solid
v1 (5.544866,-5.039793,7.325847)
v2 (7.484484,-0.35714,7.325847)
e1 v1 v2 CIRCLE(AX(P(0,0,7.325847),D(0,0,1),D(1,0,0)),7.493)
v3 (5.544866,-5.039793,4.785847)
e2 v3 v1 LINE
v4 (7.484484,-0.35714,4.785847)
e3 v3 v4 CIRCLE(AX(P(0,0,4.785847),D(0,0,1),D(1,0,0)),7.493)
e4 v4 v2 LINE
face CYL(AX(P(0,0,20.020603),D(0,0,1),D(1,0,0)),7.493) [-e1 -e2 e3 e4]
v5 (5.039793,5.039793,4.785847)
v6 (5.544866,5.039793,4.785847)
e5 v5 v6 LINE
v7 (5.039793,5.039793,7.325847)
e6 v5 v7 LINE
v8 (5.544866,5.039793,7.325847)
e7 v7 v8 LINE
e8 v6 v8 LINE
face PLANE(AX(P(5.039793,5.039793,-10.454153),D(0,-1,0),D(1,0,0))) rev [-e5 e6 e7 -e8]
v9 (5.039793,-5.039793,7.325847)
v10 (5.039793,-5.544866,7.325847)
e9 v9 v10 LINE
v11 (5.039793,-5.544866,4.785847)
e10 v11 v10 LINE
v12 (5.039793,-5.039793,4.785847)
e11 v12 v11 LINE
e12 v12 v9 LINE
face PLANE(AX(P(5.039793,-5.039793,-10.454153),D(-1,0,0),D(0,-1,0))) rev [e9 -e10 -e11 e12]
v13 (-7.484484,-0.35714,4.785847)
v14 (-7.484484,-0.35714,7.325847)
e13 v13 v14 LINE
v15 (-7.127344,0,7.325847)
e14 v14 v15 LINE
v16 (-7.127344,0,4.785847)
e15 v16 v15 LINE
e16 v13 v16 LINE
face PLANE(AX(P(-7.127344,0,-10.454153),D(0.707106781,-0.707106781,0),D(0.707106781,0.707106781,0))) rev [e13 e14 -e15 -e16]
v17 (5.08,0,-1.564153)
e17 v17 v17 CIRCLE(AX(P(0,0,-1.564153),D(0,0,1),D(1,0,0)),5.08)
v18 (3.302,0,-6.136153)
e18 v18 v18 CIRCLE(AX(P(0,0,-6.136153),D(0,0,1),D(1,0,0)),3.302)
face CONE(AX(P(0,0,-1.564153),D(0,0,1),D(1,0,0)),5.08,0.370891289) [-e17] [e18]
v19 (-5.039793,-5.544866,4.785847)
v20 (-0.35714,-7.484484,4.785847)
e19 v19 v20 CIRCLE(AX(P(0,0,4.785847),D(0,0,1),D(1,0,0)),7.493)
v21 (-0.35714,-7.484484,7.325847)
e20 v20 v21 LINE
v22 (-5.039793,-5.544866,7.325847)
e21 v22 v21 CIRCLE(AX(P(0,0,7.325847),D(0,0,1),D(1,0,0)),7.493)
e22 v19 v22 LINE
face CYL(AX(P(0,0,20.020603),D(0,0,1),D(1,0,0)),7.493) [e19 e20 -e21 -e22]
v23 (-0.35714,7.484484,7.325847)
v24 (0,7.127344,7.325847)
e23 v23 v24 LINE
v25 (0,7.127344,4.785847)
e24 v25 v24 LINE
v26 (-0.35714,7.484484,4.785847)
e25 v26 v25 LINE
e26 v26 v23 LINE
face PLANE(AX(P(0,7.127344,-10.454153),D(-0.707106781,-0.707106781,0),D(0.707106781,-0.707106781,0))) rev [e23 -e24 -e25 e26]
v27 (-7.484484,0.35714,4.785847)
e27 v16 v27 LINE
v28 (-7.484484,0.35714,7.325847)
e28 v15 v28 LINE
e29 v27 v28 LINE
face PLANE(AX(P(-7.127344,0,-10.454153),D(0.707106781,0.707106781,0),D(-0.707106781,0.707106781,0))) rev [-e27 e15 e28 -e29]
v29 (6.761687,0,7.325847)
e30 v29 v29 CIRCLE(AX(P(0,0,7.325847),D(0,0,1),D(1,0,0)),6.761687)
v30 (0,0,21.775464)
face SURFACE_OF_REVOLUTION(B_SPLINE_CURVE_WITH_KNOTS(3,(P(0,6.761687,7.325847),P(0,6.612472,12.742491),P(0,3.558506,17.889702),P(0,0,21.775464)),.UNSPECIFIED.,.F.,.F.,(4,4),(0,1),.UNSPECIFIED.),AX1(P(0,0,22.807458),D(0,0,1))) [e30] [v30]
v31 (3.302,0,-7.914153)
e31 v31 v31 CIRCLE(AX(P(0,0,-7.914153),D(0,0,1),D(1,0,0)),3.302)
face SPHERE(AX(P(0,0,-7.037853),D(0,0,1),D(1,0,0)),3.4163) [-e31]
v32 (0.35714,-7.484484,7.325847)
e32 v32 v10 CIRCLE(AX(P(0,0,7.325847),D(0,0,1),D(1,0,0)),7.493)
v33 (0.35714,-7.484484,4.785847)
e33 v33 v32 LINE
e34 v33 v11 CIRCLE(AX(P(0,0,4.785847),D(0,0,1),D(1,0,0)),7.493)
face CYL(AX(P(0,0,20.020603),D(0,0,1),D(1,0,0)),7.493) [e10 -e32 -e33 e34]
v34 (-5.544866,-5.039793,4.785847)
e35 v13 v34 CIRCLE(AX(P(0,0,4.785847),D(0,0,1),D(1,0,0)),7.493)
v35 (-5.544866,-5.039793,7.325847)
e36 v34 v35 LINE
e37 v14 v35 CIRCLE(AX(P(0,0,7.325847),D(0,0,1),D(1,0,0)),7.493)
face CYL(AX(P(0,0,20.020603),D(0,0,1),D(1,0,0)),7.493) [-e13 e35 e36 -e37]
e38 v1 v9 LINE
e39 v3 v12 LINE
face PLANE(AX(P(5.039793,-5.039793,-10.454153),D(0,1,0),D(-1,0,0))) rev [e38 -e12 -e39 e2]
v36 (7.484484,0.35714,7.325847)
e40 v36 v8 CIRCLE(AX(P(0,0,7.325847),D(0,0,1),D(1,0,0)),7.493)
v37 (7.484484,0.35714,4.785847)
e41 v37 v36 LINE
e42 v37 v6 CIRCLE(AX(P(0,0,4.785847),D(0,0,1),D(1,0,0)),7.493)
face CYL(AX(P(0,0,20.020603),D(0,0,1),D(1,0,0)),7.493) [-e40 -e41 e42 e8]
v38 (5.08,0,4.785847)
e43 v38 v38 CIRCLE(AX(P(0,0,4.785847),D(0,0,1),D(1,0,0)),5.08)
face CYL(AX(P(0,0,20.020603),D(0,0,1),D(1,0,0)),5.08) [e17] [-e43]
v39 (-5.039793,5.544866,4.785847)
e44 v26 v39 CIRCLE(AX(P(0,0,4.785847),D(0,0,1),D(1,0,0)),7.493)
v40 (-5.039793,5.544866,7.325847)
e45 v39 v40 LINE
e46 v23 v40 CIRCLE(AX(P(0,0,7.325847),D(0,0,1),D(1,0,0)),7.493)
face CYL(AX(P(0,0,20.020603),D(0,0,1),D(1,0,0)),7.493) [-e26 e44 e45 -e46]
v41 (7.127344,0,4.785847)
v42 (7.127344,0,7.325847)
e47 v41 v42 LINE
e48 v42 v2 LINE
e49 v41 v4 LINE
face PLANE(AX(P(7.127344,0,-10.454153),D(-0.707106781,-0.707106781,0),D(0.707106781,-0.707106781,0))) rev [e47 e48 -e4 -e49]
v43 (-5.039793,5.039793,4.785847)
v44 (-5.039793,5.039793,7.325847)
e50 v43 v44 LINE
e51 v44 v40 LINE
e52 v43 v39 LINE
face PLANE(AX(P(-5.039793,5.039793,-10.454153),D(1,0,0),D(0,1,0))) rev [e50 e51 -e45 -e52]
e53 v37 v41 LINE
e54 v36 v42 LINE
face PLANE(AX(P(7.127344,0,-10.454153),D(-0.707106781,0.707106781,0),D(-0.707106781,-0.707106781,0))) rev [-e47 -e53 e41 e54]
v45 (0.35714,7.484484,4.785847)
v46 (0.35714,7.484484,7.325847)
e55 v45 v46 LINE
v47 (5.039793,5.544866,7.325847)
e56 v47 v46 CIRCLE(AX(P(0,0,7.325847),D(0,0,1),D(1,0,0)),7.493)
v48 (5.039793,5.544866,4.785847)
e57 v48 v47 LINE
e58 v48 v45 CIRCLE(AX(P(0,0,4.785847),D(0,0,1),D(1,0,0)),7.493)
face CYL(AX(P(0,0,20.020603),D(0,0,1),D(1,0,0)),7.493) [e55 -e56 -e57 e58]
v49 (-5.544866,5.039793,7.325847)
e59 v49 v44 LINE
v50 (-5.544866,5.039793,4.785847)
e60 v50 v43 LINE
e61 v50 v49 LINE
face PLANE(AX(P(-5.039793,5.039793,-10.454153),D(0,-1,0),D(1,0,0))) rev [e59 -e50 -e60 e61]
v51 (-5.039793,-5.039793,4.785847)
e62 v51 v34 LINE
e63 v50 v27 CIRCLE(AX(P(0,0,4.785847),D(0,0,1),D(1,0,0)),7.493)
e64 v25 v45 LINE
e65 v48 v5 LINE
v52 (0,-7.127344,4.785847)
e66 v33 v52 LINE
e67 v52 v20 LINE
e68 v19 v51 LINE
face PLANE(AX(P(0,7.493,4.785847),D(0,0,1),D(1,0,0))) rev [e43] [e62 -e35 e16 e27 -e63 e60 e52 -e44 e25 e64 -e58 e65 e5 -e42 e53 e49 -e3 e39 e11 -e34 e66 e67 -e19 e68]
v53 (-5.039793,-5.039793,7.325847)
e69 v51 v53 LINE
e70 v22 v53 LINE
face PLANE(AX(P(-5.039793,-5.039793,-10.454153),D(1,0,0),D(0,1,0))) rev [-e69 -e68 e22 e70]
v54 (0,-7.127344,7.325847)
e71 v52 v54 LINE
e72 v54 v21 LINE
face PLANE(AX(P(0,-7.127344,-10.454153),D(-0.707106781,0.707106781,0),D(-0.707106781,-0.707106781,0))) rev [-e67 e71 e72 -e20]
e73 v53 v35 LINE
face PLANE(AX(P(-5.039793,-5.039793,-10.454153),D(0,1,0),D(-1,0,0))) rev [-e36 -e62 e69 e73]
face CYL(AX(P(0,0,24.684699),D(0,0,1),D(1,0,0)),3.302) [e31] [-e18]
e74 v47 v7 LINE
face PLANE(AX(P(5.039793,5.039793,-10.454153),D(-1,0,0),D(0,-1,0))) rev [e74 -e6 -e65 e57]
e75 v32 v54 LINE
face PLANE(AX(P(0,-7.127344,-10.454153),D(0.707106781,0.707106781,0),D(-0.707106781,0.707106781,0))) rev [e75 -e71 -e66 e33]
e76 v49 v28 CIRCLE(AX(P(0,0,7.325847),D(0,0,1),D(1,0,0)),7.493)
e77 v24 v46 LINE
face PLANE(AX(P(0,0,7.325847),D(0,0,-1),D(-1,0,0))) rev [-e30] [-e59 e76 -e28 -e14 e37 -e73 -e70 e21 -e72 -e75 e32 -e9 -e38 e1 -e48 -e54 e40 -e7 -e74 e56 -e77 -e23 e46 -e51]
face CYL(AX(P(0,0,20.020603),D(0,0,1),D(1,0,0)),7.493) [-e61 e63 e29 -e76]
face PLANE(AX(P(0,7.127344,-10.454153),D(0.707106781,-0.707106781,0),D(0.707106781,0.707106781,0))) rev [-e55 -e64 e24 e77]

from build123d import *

# Parameters (mm, degrees)
DOME1_FACE_RADIUS  = 3.302
DOME1_HEIGHT       = 2.54
CUT_EXTRUDE4_DEPTH = 21.698272826
SEEDCUT_COUNT      = 8


# Read off the part's stored shape, not the designer's step: Cut-Revolve-Thin7
with BuildPart() as part:
    # Sketch1 → Revolve5 (revolve)
    with BuildSketch(Plane(origin=(0, 0, 0), x_dir=(0, 0, -1), z_dir=(1, 0, 0)), mode=Mode.PRIVATE) as revolve5_sk:
        Polygon((-7.325846616, 0), (-7.325846616, 7.493), (-4.785846616, 7.493), (-4.785846616, 5.08), (7.914153384, 5.08), (7.914153384, 0), align=None)
    revolve(revolve5_sk.sketch.rotate(Axis((0, 0, 20.020603184), (0, 0, -1)), 90), axis=Axis((0, 0, 20.020603184), (0, 0, -1)))

    # Sketch2 → Revolve12 (revolve)
    with BuildSketch(Plane(origin=(0, 0, 0), x_dir=(0, 0, -1), z_dir=(1, 0, 0))):
        with BuildLine():
            Line((-7.325846616, 0), (-21.775464383, 0))
            add(Edge.make_bspline(
                [(-7.325846616, 6.761687124), (-12.74249131, 6.612472482), (-17.889702324, 3.558506137), (-21.775464383, 0)],
                knots=[0, 0, 0, 0, 1, 1, 1, 1], degree=3))
            Line((-7.325846616, 6.761687124), (-7.325846616, 0))
        make_face()
    revolve(axis=Axis((0, 0, 22.807457961), (0, 0, -1)))

    # Cut-Revolve-Thin7 outline → Cut-Revolve-Thin7 (revolve, cut)
    with BuildSketch(Plane.XZ):
        Polygon((3.302, -6.136153384), (3.302, -7.914153384), (5.08, -7.914153384), (5.08, -1.564153384), align=None)
    revolve(axis=Axis((0, 0, 0), (0, 0, 1)), mode=Mode.SUBTRACT)

    # Dome1: a dome of height H over a round flat face of radius A is a cap of a sphere of radius (A * A + H * H) / (2 * H)
    dome1_r = (DOME1_FACE_RADIUS * DOME1_FACE_RADIUS + DOME1_HEIGHT * DOME1_HEIGHT) / (2 * DOME1_HEIGHT)
    dome1_base = Plane((0, 0, -7.914153384), z_dir=(0, 0, -1))
    with Locations(dome1_base.offset(DOME1_HEIGHT - dome1_r)):
        dome1_ball = Sphere(dome1_r, mode=Mode.PRIVATE)
    add(split(dome1_ball, bisect_by=dome1_base, keep=Keep.TOP, mode=Mode.PRIVATE))

    # Sketch6 → Cut-Extrude4 (cut, through all)
    with BuildSketch(Plane.XY.offset(7.325846616)):
        with BuildLine():
            Line((0, 7.127343562), (0.357140372, 7.484483934))
            ThreePointArc((0.357140372, 7.484483934), (0, 7.493), (-0.357140372, 7.484483934))
            Line((-0.357140372, 7.484483934), (0, 7.127343562))
        make_face()
    cut_extrude4 = extrude(amount=-CUT_EXTRUDE4_DEPTH, mode=Mode.SUBTRACT)

    # SeedCut: Cut-Extrude4 ×8 about axis
    seedcut_axis = Axis((0, 0, 0), (0, 0, 1))
    for i in range(1, SEEDCUT_COUNT):
        add(cut_extrude4.rotate(seedcut_axis, i * 360 / SEEDCUT_COUNT), mode=Mode.SUBTRACT)


solid = part.part
